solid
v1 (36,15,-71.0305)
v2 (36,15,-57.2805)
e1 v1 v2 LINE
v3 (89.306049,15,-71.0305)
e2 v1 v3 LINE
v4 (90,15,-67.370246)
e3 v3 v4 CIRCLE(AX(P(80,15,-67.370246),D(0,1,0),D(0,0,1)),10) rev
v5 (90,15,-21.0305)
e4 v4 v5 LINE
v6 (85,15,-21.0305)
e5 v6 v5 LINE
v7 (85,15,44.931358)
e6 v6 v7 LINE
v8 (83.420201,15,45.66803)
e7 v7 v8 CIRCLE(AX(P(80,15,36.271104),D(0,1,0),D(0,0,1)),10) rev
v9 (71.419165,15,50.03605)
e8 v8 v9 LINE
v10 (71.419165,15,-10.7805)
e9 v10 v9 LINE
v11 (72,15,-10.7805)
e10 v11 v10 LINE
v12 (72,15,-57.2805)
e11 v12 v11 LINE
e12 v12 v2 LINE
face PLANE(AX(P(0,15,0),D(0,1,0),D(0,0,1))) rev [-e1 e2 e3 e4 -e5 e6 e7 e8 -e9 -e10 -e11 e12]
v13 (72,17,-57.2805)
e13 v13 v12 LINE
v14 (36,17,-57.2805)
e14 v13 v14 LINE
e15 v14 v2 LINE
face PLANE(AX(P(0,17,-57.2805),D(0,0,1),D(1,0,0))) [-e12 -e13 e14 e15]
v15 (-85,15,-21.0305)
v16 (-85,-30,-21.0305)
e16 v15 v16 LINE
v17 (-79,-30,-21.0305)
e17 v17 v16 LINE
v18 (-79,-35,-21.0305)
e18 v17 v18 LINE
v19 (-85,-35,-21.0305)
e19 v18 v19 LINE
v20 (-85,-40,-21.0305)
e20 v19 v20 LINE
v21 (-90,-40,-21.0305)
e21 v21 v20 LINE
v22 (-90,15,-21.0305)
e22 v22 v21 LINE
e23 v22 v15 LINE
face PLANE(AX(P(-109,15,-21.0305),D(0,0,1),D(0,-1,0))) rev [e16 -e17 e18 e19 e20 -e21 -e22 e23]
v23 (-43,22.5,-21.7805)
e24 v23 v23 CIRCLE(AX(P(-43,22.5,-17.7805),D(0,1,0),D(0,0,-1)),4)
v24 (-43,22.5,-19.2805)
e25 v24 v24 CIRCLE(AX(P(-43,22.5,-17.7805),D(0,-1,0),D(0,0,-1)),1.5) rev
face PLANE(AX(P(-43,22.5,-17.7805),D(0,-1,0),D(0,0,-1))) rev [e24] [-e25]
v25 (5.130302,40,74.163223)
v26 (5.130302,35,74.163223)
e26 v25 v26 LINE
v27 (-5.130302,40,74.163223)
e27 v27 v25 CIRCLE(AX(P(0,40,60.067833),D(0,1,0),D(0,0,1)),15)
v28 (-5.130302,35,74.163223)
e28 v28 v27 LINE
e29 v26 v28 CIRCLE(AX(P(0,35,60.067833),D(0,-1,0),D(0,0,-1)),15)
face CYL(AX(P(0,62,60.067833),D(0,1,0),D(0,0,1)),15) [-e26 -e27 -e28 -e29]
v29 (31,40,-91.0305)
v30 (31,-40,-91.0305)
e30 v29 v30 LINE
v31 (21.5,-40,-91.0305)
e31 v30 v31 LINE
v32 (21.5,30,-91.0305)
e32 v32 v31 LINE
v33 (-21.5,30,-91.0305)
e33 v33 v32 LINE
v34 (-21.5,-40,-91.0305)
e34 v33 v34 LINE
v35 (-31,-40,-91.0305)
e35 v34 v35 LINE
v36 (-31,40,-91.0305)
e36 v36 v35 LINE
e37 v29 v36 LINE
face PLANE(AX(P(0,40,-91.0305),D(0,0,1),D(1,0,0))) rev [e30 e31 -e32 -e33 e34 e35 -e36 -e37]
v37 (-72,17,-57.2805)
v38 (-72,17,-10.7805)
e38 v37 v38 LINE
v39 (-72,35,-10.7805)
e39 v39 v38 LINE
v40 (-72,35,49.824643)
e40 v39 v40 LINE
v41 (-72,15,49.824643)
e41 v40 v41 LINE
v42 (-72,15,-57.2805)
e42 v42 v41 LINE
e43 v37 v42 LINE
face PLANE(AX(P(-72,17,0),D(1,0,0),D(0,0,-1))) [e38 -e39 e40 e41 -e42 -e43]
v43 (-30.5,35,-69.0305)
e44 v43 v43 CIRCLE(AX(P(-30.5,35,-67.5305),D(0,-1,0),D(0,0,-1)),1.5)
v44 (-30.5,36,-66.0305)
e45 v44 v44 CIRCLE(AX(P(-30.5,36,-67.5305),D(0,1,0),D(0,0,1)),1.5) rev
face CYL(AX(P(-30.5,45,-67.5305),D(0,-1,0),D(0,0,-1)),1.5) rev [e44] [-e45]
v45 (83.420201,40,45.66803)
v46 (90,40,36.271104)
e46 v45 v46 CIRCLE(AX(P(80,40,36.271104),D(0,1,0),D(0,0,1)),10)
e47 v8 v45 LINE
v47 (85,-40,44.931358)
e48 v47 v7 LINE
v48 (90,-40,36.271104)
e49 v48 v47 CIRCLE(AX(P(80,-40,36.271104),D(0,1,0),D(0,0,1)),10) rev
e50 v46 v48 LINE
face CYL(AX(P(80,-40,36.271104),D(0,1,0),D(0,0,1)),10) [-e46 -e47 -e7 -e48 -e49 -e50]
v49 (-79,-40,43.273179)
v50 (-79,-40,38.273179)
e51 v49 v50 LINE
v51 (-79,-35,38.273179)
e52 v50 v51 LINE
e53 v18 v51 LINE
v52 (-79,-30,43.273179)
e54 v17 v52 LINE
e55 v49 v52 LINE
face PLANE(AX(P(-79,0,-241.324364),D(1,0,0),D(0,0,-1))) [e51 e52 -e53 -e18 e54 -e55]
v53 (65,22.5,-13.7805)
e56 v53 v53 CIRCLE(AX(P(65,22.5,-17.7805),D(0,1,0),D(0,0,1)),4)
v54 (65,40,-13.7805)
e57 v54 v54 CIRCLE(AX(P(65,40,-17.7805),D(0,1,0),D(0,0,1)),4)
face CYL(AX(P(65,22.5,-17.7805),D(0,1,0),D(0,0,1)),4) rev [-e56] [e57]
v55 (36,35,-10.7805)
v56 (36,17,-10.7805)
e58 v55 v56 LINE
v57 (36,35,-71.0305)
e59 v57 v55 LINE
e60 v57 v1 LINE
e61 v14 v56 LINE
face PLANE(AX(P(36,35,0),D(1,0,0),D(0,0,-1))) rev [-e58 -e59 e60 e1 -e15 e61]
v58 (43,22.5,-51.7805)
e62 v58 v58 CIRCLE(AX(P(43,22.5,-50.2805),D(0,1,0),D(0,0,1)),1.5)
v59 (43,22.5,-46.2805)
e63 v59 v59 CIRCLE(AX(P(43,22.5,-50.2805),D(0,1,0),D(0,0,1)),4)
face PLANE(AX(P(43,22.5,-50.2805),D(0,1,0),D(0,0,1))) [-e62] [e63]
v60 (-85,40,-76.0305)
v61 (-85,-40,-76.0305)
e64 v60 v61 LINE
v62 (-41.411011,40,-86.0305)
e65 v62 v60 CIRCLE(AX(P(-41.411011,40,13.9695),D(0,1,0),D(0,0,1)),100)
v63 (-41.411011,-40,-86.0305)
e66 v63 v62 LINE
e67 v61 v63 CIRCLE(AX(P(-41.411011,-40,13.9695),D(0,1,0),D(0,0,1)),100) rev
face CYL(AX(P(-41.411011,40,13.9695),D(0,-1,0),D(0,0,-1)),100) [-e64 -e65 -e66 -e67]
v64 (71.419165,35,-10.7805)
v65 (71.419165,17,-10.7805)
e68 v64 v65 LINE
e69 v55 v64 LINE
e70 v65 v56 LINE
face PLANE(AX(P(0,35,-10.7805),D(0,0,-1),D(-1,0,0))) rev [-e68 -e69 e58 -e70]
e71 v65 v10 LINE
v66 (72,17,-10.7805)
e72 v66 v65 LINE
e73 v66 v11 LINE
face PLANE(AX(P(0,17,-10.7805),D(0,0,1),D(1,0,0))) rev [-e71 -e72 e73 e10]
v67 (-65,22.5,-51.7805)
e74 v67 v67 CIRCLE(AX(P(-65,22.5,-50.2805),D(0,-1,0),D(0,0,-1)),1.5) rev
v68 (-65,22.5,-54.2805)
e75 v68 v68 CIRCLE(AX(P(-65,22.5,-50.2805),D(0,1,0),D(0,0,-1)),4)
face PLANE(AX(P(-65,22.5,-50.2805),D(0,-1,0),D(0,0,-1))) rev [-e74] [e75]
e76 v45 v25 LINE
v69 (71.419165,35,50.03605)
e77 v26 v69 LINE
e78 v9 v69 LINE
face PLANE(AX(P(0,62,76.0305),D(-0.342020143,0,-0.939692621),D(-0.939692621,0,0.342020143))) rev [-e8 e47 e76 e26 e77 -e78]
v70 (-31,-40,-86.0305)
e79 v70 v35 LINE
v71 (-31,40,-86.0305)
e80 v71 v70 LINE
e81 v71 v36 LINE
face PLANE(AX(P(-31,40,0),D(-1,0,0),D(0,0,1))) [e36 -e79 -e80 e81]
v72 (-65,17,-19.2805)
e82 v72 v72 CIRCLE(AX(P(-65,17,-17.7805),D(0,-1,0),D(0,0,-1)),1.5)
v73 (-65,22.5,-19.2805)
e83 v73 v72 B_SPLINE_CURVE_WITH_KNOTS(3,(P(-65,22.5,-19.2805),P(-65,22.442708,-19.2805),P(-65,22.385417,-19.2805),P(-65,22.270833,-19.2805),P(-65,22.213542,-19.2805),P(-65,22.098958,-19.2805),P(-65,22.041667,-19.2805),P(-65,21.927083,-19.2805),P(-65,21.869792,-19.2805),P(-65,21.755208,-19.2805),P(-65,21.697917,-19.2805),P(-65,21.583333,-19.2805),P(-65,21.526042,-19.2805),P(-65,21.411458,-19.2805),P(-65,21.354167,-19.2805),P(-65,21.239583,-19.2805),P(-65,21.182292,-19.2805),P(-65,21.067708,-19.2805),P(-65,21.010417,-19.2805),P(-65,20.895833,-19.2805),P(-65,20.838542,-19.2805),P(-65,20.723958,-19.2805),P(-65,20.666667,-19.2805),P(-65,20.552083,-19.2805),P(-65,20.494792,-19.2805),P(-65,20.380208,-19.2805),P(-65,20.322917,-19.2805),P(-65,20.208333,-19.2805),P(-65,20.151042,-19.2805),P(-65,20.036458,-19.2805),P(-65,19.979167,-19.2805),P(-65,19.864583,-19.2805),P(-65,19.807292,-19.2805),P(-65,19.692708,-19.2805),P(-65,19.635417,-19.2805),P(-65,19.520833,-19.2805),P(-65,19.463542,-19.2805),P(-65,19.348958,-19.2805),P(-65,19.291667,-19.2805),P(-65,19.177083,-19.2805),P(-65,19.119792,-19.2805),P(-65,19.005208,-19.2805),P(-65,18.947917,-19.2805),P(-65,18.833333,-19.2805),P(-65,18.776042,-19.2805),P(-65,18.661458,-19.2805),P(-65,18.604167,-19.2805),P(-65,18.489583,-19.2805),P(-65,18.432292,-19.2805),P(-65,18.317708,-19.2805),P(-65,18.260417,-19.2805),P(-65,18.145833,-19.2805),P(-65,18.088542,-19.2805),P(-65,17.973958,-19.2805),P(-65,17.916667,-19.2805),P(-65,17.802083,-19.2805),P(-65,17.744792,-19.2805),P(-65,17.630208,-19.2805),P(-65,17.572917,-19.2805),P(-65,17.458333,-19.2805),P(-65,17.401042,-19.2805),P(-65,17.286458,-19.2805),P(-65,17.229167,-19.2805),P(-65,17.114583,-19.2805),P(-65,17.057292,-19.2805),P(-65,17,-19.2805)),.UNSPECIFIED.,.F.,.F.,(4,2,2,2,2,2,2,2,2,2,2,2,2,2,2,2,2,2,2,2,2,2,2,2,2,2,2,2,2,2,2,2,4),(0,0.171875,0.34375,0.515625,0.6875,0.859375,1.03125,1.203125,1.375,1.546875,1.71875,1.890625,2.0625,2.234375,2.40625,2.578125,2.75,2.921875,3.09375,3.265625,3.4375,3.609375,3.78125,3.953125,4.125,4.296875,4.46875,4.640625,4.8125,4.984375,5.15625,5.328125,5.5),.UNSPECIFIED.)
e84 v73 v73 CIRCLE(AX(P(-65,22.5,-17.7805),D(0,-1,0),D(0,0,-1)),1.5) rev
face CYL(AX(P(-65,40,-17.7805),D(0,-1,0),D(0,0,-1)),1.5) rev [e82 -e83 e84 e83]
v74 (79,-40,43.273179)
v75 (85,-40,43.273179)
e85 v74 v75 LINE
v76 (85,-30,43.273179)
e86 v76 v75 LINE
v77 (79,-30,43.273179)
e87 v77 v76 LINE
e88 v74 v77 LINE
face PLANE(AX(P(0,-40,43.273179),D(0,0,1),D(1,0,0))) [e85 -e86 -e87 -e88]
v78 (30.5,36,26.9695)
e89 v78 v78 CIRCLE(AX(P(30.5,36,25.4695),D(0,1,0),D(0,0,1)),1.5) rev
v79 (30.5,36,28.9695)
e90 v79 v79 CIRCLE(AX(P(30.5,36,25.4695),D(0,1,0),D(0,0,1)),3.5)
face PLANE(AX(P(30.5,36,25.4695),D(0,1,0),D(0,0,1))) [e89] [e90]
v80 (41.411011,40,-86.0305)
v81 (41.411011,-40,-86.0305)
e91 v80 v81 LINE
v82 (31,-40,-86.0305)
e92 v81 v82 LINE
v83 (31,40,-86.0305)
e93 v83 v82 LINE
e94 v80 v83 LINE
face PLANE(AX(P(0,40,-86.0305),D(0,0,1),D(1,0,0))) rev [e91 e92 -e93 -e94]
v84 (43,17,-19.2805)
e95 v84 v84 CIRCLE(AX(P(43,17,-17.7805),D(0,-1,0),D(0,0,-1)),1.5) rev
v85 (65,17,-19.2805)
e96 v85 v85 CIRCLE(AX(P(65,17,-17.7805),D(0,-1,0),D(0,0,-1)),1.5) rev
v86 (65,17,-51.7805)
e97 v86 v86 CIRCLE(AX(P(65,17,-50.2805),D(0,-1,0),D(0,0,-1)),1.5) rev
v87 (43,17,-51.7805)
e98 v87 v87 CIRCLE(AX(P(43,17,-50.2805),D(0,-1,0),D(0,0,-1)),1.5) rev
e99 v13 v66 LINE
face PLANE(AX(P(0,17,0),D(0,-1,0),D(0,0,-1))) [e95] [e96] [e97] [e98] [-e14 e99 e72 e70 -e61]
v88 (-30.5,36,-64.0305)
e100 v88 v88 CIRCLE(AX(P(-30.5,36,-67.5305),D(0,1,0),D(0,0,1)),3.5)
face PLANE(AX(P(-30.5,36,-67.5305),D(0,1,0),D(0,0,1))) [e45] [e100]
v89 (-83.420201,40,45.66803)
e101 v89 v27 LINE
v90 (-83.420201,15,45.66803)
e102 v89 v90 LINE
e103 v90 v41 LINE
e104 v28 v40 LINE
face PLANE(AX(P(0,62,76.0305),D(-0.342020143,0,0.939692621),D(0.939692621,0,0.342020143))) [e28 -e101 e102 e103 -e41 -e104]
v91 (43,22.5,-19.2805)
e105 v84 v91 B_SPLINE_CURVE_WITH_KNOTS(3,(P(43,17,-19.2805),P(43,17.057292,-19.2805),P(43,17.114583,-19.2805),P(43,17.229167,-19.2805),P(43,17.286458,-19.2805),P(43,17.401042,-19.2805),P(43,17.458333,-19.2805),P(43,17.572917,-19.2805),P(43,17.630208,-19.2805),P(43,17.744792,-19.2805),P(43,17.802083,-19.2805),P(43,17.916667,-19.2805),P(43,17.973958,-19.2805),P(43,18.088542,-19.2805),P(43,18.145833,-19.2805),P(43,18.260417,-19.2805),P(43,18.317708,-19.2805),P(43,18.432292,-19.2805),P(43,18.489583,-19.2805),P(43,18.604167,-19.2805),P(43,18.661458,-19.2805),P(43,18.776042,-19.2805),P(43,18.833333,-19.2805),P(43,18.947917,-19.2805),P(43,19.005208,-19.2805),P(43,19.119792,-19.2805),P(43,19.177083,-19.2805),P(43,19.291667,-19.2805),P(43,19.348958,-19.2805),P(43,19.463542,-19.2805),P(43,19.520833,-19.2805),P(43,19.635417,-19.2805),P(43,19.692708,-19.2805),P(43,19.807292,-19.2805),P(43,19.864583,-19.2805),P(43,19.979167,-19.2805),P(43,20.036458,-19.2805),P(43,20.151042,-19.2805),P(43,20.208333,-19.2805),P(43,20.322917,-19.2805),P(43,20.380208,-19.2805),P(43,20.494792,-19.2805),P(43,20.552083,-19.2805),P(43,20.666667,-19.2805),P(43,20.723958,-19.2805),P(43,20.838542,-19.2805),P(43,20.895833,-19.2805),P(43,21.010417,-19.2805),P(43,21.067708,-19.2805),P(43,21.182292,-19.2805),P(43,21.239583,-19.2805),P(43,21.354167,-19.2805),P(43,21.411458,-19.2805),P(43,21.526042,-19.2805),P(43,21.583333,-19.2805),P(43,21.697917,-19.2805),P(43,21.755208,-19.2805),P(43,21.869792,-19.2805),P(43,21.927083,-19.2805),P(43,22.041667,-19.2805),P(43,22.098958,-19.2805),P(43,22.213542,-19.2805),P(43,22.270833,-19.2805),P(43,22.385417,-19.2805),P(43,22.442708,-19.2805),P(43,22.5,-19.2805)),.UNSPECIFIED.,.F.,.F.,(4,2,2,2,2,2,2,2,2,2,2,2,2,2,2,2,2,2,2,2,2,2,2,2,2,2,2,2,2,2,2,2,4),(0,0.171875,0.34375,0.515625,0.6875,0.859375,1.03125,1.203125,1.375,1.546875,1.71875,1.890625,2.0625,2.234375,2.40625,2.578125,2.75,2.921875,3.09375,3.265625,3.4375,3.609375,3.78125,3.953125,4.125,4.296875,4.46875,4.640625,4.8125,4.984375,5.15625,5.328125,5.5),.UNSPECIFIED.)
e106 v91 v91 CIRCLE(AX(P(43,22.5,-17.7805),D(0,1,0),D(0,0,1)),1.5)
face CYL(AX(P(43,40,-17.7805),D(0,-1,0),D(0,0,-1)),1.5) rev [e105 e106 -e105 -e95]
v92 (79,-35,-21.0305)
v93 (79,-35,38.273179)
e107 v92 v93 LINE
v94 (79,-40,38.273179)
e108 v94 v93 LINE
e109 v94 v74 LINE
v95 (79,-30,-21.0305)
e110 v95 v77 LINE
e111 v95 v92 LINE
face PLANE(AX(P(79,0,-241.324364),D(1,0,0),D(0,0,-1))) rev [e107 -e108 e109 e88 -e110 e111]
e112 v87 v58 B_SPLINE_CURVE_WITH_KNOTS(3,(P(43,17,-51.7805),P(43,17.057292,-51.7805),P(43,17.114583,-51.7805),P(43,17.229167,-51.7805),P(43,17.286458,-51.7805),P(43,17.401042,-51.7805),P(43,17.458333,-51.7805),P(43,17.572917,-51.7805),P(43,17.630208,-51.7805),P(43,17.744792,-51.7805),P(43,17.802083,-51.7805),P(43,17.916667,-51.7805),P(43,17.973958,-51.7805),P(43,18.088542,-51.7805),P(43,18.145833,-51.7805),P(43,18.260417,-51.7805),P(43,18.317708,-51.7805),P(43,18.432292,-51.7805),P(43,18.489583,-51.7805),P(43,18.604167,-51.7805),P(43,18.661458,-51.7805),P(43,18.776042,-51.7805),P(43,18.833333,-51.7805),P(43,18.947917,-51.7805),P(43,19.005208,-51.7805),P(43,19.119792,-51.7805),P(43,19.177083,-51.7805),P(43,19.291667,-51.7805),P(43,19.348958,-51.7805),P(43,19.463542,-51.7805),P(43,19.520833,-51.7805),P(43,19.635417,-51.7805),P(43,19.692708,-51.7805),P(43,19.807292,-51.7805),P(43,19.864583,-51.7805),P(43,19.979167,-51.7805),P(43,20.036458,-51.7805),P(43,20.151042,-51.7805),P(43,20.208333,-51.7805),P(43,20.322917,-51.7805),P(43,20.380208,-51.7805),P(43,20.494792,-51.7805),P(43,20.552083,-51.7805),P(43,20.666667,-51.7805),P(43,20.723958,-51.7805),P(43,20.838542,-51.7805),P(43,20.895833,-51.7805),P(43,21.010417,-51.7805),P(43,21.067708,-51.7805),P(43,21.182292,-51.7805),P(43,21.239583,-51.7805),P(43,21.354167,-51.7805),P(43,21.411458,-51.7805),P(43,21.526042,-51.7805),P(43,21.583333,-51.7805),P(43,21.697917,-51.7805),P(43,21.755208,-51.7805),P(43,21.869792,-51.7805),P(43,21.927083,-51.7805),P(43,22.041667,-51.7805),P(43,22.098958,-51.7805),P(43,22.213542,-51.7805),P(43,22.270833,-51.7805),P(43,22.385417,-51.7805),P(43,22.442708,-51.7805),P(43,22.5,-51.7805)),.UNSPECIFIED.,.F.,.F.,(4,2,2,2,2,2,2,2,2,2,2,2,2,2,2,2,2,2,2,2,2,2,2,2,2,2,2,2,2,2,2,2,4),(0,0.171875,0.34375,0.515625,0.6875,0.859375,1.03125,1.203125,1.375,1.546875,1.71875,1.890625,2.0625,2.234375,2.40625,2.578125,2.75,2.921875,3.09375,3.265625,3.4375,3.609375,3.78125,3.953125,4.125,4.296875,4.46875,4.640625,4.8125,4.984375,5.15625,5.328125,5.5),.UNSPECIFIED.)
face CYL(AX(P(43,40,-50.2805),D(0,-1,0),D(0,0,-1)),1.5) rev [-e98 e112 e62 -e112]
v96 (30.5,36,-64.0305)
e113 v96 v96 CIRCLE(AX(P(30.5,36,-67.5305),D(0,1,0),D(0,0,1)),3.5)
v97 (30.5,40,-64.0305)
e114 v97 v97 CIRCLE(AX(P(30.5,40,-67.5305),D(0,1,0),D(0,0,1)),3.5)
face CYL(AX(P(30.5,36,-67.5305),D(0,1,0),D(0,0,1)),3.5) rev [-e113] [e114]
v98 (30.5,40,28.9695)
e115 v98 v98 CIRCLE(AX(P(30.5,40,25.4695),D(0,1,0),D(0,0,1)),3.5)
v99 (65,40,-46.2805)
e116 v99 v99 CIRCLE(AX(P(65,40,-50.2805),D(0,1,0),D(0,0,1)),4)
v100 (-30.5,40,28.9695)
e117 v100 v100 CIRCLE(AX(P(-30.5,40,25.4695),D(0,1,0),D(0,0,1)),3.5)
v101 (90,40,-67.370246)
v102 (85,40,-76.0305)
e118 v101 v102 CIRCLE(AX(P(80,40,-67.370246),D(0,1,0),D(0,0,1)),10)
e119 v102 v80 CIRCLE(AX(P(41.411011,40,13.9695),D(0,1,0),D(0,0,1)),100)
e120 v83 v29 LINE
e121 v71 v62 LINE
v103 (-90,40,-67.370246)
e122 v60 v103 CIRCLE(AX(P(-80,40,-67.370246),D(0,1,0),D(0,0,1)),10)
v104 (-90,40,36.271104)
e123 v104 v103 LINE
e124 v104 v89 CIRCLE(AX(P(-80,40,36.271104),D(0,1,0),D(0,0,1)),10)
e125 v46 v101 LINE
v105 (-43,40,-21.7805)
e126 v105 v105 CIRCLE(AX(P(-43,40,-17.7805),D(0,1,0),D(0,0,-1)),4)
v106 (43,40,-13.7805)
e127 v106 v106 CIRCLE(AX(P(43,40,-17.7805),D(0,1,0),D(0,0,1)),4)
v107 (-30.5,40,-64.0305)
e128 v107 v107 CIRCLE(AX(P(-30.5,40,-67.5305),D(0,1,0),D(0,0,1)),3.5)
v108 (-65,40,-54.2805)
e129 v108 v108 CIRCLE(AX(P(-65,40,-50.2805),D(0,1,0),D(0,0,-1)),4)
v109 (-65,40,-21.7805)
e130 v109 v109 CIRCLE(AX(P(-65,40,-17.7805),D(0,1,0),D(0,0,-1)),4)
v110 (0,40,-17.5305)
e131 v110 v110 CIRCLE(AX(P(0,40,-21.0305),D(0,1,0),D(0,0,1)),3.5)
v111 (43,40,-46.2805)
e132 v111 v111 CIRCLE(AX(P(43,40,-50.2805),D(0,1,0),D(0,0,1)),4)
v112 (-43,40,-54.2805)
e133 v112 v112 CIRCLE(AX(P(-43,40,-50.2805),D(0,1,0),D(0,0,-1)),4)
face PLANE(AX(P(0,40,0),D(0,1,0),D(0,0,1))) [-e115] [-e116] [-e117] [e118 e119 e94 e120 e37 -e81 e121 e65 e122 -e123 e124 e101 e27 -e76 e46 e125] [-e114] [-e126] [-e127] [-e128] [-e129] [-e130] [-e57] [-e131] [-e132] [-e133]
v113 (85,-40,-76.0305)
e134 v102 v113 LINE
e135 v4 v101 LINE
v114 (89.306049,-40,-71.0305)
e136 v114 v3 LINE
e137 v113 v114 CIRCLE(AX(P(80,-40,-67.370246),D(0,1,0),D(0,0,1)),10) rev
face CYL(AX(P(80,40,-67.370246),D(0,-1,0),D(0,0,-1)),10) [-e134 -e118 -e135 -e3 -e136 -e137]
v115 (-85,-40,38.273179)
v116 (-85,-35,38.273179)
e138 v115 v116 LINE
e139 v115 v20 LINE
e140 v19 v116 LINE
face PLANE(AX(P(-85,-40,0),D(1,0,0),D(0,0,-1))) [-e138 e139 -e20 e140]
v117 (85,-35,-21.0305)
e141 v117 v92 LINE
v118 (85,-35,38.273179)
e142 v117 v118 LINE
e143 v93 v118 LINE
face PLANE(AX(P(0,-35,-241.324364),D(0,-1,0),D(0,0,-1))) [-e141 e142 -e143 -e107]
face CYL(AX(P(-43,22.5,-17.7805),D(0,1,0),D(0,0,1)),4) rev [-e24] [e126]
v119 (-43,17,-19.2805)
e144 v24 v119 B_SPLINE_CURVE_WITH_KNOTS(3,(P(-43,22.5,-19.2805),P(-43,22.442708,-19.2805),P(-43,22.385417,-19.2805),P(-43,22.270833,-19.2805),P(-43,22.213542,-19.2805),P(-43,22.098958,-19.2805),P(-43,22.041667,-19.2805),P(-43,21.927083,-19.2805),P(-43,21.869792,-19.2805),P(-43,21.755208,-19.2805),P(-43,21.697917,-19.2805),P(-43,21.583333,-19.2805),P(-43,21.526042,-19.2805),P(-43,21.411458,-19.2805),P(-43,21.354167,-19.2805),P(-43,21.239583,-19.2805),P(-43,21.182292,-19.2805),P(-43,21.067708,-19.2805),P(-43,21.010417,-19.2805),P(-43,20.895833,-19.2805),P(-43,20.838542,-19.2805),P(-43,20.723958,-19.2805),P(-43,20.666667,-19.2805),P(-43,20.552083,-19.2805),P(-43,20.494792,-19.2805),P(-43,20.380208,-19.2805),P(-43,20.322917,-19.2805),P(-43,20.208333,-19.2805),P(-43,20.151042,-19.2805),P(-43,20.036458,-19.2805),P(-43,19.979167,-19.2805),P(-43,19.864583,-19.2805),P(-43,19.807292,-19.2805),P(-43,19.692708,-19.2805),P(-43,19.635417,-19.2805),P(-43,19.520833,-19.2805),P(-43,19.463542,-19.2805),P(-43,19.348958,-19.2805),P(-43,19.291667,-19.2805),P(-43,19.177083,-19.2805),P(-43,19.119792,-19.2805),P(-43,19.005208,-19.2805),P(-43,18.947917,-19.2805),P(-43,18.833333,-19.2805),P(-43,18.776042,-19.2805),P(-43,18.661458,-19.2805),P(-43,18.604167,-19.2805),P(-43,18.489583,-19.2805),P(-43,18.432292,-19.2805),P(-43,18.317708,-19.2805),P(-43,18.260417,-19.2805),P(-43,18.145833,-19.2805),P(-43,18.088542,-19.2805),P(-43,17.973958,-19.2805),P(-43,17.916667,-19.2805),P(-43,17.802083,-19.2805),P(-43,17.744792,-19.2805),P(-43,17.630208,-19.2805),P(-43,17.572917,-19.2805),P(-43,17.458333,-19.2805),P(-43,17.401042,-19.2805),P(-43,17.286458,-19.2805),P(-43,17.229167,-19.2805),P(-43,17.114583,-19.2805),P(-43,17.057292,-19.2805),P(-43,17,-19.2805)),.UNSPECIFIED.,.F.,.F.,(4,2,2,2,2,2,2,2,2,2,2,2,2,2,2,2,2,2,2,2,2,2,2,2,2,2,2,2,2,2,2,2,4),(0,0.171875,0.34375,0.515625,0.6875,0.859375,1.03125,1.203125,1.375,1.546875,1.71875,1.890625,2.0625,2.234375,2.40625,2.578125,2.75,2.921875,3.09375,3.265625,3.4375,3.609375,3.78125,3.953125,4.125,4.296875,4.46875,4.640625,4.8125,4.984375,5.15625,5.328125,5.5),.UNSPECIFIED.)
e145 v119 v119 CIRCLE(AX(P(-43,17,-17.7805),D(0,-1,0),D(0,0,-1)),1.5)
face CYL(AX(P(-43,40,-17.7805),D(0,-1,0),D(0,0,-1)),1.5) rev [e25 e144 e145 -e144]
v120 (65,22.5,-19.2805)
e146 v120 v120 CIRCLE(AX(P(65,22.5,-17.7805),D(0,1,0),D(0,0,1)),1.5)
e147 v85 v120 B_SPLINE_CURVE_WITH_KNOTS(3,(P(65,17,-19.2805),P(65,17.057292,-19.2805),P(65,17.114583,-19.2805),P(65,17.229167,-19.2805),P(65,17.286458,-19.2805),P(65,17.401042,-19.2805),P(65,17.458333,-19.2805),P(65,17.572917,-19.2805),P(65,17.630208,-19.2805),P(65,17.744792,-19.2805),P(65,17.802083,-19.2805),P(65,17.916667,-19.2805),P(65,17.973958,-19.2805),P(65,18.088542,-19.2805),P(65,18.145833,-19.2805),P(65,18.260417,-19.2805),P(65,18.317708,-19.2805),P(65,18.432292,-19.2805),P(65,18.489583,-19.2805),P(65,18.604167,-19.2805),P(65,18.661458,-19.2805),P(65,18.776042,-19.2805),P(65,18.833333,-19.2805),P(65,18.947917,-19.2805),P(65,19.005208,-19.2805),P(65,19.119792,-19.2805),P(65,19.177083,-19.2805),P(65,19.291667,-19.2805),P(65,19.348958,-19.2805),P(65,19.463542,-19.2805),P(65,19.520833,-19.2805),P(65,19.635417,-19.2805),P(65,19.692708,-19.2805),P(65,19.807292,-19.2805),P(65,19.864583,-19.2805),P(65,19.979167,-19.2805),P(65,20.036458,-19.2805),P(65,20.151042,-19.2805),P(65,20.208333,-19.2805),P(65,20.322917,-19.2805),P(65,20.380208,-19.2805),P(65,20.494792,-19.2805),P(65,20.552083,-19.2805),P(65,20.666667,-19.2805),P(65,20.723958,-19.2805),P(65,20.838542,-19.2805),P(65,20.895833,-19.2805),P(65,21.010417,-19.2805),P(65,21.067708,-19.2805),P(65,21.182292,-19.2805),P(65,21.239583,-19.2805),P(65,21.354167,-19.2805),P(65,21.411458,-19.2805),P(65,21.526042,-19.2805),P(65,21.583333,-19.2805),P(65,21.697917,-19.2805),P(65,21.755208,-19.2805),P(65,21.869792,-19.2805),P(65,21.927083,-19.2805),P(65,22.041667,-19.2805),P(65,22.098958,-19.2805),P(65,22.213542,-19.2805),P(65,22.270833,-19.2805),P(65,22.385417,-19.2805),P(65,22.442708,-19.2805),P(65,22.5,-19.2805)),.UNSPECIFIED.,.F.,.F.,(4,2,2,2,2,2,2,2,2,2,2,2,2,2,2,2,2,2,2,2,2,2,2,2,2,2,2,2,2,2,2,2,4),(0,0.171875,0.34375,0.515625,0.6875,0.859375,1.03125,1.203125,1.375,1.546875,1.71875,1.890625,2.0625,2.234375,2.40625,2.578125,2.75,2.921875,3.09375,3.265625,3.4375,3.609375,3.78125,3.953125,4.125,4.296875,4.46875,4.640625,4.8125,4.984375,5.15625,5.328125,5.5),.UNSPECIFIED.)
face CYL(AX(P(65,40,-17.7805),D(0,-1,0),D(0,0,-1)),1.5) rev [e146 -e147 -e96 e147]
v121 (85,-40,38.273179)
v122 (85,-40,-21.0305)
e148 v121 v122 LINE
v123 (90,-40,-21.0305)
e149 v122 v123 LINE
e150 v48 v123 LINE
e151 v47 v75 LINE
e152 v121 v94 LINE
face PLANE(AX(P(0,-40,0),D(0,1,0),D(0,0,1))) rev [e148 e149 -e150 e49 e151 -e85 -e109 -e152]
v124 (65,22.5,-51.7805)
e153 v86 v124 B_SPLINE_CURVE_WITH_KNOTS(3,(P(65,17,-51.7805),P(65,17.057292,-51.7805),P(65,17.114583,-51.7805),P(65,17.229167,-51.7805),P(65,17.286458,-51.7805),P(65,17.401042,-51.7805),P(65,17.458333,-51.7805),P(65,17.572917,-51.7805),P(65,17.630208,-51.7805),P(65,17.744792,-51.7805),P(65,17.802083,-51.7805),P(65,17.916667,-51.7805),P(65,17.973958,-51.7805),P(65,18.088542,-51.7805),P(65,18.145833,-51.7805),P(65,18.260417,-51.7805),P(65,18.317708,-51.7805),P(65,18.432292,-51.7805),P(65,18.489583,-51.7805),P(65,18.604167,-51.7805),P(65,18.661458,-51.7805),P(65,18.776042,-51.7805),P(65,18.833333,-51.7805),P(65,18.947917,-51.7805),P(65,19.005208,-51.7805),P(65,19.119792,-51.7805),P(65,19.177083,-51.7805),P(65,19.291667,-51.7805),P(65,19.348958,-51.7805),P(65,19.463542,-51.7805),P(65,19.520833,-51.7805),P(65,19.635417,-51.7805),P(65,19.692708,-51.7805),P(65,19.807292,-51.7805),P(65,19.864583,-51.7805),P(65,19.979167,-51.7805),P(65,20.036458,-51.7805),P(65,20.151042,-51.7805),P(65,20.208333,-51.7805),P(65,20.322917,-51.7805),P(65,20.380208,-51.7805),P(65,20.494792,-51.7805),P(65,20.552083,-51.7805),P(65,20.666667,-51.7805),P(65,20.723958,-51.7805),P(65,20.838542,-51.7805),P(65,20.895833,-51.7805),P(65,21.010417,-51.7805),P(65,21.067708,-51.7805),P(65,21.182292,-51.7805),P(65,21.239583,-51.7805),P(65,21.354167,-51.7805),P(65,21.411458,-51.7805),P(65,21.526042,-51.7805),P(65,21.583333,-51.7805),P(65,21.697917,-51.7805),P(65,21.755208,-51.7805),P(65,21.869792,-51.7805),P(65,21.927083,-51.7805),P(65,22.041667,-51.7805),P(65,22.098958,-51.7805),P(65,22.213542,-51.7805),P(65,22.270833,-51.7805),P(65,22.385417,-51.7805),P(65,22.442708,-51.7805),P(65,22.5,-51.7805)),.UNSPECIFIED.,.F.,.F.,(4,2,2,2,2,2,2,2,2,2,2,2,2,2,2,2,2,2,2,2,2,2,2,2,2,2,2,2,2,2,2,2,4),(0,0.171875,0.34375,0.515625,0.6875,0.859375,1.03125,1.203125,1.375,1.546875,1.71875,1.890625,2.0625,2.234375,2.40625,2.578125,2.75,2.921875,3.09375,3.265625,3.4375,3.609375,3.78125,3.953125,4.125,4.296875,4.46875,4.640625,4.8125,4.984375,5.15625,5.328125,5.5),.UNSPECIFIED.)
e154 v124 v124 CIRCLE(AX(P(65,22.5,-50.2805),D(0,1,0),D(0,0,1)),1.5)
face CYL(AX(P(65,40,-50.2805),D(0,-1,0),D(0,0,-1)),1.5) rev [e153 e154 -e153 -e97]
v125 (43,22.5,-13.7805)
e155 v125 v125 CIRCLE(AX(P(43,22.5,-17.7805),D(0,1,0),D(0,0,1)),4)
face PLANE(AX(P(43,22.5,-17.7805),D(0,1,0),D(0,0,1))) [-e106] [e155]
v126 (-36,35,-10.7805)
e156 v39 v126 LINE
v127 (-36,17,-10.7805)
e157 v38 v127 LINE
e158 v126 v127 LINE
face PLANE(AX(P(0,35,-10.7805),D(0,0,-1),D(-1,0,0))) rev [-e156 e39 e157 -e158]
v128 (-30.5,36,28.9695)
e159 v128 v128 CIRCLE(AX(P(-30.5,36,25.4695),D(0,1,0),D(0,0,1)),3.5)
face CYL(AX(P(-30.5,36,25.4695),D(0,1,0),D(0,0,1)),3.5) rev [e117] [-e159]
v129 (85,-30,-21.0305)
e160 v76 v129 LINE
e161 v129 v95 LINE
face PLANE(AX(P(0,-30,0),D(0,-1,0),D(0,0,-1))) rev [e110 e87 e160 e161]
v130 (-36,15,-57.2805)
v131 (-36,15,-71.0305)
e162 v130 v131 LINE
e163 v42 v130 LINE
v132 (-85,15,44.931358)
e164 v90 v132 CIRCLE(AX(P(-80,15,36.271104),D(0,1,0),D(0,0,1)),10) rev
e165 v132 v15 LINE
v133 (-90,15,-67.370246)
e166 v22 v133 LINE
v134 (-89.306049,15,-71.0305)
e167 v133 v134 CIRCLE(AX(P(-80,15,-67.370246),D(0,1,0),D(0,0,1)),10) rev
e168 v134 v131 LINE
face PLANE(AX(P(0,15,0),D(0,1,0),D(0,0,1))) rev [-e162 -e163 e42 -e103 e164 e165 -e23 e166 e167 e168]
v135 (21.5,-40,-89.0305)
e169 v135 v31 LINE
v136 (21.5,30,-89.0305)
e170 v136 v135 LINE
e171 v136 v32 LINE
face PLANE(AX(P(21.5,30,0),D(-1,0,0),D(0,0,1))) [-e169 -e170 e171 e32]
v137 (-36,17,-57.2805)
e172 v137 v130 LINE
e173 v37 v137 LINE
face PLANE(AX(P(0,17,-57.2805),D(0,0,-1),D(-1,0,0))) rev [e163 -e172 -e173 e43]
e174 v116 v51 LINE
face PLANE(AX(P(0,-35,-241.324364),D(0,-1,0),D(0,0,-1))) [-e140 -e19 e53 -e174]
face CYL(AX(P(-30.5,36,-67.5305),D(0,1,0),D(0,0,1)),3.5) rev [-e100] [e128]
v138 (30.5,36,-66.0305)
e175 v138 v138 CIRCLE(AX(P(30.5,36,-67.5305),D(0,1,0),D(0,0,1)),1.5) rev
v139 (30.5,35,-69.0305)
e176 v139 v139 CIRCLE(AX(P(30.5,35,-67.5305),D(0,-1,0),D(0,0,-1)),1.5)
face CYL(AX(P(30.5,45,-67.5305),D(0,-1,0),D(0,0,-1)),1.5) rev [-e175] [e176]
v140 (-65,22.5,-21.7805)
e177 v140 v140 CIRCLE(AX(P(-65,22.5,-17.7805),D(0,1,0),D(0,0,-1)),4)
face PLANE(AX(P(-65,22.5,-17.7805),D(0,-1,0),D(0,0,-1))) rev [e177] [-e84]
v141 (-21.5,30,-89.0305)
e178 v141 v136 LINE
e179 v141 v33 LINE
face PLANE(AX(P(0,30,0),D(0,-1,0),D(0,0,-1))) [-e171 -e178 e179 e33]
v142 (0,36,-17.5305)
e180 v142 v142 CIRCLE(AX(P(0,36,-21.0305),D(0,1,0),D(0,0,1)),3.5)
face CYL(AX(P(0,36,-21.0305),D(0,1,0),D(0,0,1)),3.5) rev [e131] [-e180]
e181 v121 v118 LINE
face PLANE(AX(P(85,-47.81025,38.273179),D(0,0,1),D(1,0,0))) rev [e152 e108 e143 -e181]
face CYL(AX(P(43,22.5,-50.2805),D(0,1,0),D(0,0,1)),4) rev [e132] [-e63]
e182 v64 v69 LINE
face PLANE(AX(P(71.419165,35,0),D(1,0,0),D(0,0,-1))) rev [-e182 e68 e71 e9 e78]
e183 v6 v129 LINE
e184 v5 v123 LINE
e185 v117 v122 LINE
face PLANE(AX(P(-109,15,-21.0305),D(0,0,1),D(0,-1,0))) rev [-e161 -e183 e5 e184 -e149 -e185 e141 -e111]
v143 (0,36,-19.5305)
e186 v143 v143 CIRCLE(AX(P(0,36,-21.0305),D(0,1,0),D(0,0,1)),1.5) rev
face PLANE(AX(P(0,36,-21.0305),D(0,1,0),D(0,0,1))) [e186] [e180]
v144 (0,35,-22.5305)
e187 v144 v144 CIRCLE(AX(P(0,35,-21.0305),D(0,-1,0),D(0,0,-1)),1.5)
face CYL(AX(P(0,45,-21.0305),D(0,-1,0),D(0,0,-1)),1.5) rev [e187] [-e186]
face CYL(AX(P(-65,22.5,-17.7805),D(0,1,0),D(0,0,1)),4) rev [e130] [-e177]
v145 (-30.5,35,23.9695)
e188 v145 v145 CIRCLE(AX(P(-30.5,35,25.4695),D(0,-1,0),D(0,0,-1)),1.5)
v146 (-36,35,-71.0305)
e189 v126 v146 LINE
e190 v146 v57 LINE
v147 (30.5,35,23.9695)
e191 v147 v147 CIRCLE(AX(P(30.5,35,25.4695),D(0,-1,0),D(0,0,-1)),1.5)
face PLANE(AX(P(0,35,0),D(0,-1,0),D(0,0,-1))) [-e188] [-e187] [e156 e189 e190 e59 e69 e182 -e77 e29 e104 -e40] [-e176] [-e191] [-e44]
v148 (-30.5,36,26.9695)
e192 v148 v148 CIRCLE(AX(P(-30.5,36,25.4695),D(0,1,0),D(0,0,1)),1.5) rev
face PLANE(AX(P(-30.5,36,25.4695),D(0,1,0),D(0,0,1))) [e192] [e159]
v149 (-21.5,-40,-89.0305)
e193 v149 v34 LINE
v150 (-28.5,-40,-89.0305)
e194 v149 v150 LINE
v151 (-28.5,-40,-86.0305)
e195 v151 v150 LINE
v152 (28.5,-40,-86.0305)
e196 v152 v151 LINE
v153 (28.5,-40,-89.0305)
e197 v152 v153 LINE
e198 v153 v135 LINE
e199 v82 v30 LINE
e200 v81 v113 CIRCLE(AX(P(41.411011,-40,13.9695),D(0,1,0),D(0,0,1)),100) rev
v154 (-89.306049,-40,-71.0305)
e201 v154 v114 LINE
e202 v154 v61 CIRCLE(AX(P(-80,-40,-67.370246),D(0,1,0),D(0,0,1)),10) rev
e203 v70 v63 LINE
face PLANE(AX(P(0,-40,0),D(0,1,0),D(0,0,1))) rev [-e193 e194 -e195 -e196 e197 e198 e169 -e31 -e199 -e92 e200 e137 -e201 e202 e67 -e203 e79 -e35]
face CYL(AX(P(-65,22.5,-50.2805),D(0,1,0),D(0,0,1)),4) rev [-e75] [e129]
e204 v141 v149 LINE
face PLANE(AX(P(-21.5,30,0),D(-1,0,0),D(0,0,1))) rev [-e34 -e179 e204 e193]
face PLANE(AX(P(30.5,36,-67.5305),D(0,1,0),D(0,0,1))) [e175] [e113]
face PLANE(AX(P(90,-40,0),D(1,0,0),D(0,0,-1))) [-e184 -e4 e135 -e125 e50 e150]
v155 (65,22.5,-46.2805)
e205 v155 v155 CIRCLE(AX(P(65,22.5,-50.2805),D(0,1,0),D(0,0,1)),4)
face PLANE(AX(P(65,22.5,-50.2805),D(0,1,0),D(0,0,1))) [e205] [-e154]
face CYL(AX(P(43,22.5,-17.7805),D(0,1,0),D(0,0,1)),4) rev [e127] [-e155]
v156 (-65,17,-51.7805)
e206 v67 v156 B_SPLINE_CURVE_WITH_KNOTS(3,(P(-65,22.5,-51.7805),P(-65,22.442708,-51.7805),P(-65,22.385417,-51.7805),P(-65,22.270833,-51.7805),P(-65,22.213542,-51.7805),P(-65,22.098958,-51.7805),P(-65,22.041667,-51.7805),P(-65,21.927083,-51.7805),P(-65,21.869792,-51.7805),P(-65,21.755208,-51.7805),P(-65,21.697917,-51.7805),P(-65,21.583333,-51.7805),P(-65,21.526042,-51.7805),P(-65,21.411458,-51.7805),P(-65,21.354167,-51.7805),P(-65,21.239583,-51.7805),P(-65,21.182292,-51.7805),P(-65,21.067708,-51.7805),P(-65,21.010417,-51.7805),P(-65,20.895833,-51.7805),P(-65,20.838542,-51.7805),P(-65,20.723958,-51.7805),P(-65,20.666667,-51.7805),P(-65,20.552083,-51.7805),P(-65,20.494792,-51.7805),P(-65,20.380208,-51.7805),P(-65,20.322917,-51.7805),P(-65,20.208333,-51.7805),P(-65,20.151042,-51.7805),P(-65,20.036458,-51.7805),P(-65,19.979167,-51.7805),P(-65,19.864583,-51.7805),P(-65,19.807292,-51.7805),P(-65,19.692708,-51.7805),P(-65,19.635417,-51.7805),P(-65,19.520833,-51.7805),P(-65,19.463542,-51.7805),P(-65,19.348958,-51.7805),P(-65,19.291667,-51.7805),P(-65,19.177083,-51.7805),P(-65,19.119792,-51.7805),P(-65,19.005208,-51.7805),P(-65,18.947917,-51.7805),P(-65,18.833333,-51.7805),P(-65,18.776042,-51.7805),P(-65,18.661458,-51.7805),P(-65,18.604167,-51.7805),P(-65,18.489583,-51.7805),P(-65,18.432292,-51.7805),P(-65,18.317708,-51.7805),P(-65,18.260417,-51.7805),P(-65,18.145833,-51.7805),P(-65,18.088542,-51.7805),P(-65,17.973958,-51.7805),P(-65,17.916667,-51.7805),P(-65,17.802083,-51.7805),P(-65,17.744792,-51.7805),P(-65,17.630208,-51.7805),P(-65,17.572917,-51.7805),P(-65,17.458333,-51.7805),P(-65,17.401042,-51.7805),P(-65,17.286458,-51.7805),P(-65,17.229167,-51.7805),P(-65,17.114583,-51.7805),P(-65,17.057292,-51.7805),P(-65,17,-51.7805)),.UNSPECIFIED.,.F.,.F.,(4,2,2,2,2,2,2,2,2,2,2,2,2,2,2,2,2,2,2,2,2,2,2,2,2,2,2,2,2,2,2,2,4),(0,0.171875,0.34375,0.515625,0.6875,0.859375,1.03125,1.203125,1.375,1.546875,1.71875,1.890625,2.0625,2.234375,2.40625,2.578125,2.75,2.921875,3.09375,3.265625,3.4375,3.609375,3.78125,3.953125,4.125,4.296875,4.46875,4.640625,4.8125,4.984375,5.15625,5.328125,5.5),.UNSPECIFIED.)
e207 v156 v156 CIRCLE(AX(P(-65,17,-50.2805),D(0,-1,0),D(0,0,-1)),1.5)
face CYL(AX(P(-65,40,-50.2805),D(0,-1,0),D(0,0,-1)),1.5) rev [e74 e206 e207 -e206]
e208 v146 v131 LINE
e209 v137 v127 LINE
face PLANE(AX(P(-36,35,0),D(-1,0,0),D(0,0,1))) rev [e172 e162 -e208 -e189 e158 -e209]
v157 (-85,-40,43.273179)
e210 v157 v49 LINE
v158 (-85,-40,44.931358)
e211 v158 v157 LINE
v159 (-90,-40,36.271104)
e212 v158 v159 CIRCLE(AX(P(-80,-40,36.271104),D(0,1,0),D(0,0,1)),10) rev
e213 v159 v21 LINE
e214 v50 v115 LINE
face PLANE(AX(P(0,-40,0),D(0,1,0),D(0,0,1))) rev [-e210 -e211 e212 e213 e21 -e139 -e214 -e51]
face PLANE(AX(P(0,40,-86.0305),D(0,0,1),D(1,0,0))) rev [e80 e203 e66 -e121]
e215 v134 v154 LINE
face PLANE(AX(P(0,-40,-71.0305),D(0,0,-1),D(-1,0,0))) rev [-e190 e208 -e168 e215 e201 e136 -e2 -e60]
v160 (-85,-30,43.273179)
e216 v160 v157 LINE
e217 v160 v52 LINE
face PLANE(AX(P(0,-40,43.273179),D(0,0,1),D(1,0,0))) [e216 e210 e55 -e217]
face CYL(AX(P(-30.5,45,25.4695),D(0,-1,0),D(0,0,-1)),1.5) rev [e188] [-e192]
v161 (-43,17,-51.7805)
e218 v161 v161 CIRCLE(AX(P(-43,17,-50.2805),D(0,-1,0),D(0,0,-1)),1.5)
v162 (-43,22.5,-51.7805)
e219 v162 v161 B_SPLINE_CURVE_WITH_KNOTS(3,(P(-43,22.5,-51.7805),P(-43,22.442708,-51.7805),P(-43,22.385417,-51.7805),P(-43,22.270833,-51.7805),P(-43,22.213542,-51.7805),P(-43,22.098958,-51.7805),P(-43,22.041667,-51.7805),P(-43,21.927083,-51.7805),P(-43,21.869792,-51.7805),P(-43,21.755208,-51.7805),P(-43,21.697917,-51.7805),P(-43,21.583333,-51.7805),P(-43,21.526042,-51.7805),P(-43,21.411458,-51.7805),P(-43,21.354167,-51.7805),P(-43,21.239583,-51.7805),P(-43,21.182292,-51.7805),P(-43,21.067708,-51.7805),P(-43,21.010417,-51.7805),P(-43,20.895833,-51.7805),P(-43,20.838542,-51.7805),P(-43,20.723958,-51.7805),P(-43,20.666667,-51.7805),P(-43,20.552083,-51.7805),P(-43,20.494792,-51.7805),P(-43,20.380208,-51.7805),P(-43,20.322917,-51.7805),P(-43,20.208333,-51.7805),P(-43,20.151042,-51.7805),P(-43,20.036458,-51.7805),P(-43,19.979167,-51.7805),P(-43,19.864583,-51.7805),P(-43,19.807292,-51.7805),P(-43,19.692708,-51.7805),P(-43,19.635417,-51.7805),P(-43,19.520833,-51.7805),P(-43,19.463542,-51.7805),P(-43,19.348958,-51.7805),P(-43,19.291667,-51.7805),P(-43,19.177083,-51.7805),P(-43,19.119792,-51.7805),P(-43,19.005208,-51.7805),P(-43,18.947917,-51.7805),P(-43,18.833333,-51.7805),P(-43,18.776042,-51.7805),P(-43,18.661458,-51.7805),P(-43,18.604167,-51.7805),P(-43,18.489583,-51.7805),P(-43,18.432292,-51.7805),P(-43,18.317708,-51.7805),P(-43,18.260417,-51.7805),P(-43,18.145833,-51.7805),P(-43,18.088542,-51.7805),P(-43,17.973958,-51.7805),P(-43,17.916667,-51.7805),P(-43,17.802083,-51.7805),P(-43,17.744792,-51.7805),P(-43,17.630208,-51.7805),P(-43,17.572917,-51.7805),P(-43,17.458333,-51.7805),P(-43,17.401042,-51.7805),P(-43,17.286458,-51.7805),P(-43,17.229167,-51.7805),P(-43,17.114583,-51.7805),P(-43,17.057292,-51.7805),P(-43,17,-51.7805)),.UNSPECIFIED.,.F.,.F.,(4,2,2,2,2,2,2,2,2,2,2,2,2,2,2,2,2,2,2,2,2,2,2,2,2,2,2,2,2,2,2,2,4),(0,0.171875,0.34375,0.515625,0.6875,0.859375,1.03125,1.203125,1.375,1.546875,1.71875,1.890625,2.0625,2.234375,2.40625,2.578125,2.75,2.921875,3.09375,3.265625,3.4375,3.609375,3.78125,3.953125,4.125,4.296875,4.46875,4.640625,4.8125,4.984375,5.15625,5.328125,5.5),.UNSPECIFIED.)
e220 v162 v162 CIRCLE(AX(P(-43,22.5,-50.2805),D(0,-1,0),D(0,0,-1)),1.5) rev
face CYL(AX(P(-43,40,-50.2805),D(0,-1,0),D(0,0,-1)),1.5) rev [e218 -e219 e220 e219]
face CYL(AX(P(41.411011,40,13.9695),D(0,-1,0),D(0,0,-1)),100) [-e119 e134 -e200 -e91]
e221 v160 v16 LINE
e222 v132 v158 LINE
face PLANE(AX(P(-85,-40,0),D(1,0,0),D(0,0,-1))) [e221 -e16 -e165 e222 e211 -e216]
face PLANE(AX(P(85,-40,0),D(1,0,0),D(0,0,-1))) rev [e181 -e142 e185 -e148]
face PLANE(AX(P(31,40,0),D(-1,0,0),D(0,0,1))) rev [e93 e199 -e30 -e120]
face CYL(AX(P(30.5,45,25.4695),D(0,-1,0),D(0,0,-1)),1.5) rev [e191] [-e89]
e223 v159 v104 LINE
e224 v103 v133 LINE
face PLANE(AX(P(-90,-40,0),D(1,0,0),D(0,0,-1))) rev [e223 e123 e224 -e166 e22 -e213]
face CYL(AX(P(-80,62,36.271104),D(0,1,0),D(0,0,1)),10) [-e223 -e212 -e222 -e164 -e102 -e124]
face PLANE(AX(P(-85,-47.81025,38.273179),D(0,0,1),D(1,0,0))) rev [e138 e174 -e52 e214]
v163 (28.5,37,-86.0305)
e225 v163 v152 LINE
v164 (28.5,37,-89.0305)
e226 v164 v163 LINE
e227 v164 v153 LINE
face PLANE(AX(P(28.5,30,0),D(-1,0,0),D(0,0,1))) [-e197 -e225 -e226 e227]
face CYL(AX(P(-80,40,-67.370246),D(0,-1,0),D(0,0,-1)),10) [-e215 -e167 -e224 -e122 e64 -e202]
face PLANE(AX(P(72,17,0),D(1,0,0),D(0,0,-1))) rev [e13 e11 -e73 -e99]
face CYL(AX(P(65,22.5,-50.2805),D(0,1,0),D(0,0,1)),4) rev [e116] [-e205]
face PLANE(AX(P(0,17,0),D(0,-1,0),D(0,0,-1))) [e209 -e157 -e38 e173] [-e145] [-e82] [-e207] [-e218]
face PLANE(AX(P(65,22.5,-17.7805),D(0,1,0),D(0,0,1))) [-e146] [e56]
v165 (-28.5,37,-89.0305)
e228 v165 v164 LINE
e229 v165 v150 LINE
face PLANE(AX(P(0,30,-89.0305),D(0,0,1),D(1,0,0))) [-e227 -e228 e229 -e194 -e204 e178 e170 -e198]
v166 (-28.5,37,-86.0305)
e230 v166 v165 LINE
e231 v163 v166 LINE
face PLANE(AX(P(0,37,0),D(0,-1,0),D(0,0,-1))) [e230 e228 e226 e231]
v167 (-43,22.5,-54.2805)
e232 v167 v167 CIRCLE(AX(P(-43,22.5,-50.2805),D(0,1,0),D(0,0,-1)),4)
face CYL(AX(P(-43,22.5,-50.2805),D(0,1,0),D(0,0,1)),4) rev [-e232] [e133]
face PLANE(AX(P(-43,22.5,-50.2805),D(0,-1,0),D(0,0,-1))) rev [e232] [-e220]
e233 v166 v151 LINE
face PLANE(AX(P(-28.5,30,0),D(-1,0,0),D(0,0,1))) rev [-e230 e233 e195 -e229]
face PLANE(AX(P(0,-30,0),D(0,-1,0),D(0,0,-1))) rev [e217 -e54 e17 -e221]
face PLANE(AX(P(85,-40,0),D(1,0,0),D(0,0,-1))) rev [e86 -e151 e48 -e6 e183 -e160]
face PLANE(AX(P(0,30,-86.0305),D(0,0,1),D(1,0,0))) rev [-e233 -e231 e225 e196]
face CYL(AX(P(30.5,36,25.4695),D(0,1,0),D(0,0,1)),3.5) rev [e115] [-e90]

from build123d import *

# Parameters (mm, degrees)
BOSS_EXTRUDE1_DEPTH      = 40
BOSS_EXTRUDE1_DEPTH_BACK = 40
SKETCH1_W                = 180
SKETCH1_H                = 152.061
SHELL1_T                 = -5
SKETCH3_W                = 170
SKETCH3_H                = 142.061
BOSS_EXTRUDE2_DEPTH      = 20
SKETCH2_W                = 36
SKETCH2_H                = 55
CUT_EXTRUDE1_DEPTH       = 220
SKETCH4_W                = 36
SKETCH4_H                = 46.5
SKETCH4_R                = 1.5
CUT_EXTRUDE2_DEPTH       = 2
SKETCH4_3_R              = 1.5
CUT_EXTRUDE3_DEPTH       = 131.021678693
SKETCH5_W                = 159.952904784
SKETCH5_H                = 5
CUT_EXTRUDE4_DEPTH       = 63
SKETCH8_W                = 72
SKETCH8_H                = 29.937457508
CUT_EXTRUDE5_DEPTH       = 20
CUT_EXTRUDE7_DEPTH       = 102
SKETCH11_W               = 62
SKETCH11_H               = 5
BOSS_EXTRUDE3_DEPTH      = 80
SKETCH12_W               = 57
SKETCH12_H               = 3
SKETCH12_W_2             = 43
SKETCH12_H_2             = 2
CUT_EXTRUDE8_DEPTH       = 70
SKETCH13_W               = 57
SKETCH13_H               = 3
CUT_EXTRUDE9_DEPTH       = 7
SKETCH15_R               = 4
CUT_EXTRUDE10_DEPTH      = 17.5
SKETCH9_R                = 1.5
CUT_EXTRUDE11_DEPTH      = 10
BOSS_EXTRUDE4_DEPTH      = 10
SKETCH18_W               = 170
SKETCH18_H               = 5
SKETCH18_W_2             = 158
CUT_EXTRUDE12_DEPTH      = 114.303678916
FILLET3_R                = 100
FILLET2_R                = 10
FILLET1_R                = 15
SKETCH19_W               = 50
SKETCH19_H               = 65
CUT_EXTRUDE13_DEPTH      = 199
SKETCH20_W               = 6
SKETCH20_H               = 5
BOSS_EXTRUDE5_DEPTH      = 5
SKETCH24_R               = 3.5
CUT_EXTRUDE14_DEPTH      = 4


with BuildPart() as part:
    # Sketch1 → Boss-Extrude1 (new, two sides: drawn at the far end of the back side and taken through both)
    with BuildSketch(Plane(origin=(0, 0, 0), x_dir=(1, 0, 0), z_dir=(0, 1, 0)).offset(-BOSS_EXTRUDE1_DEPTH_BACK)):
        Rectangle(SKETCH1_W, SKETCH1_H)
    extrude(amount=BOSS_EXTRUDE1_DEPTH + BOSS_EXTRUDE1_DEPTH_BACK)

    # Shell1
    shell1_openings = [part.faces().sort_by_distance(p)[0] for p in [
        (0, -40, 0),
    ]]
    offset(amount=SHELL1_T, openings=shell1_openings, kind=Kind.INTERSECTION)

    # Sketch3 → Boss-Extrude2 (add)
    with BuildSketch(Plane.XZ.offset(-35)):
        Rectangle(SKETCH3_W, SKETCH3_H)
    extrude(amount=BOSS_EXTRUDE2_DEPTH)

    # Sketch2 → Cut-Extrude1 (cut)
    with BuildSketch(Plane.ZY.offset(90)):
        with Locations((-46.0305, -12.5)):
            Rectangle(SKETCH2_W, SKETCH2_H)
    extrude(amount=-CUT_EXTRUDE1_DEPTH, mode=Mode.SUBTRACT)

    # Sketch4 → Cut-Extrude2 (cut)
    with BuildSketch(Plane.XZ.offset(-15)):
        with Locations((-54, -34.0305)):
            Rectangle(SKETCH4_W, SKETCH4_H)
        with Locations(Location((-43, -50.2805, 0), (0, 0, 270))):
            Circle(SKETCH4_R, mode=Mode.SUBTRACT)
        with Locations(Location((-65, -50.2805, 0), (0, 0, 270))):
            Circle(SKETCH4_R, mode=Mode.SUBTRACT)
        with Locations(Location((-43, -17.7805, 0), (0, 0, 270))):
            Circle(SKETCH4_R, mode=Mode.SUBTRACT)
        with Locations(Location((-65, -17.7805, 0), (0, 0, 270))):
            Circle(SKETCH4_R, mode=Mode.SUBTRACT)
    cut_extrude2 = extrude(amount=-CUT_EXTRUDE2_DEPTH, mode=Mode.SUBTRACT)

    # Sketch4<3> → Cut-Extrude3 (cut, through all)
    with BuildSketch(Plane.XZ.offset(-15)):
        with BuildLine():
            Line((-65, -19.2805), (-65, -17.7805))
            Line((-65, -17.7805), (-63.5, -17.7805))
            ThreePointArc((-63.5, -17.7805), (-66.060660172, -16.719839828), (-65, -19.2805))
        make_face()
        with BuildLine():
            Line((-63.5, -17.7805), (-65, -17.7805))
            Line((-65, -17.7805), (-65, -19.2805))
            ThreePointArc((-65, -19.2805), (-63.939339828, -18.841160172), (-63.5, -17.7805))
        make_face()
        with BuildLine():
            Line((-65, -19.2805), (-65, -17.7805))
            Line((-65, -17.7805), (-63.5, -17.7805))
            ThreePointArc((-63.5, -17.7805), (-66.060660172, -16.719839828), (-65, -19.2805))
        make_face()
        with BuildLine():
            Line((-63.5, -17.7805), (-65, -17.7805))
            Line((-65, -17.7805), (-65, -19.2805))
            ThreePointArc((-65, -19.2805), (-63.939339828, -18.841160172), (-63.5, -17.7805))
        make_face()
        with Locations(Location((-43, -17.7805, 0), (0, 0, 270))):
            Circle(SKETCH4_3_R)
        with Locations(Location((-65, -50.2805, 0), (0, 0, 270))):
            Circle(SKETCH4_3_R)
        with Locations(Location((-43, -50.2805, 0), (0, 0, 270))):
            Circle(SKETCH4_3_R)
    cut_extrude3 = extrude(amount=-CUT_EXTRUDE3_DEPTH, mode=Mode.SUBTRACT)

    # Mirror2: Cut-Extrude2, Cut-Extrude3 across plane
    add(cut_extrude2.mirror(Plane(origin=(0, 0, 0), x_dir=(0, 0, 1), z_dir=(1, 0, 0))), mode=Mode.SUBTRACT)
    add(cut_extrude3.mirror(Plane(origin=(0, 0, 0), x_dir=(0, 0, 1), z_dir=(1, 0, 0))), mode=Mode.SUBTRACT)

    # Sketch5 → Cut-Extrude4 (cut)
    with BuildSketch(Plane.XZ.offset(-15)):
        with Locations((5.023547608, 73.5305)):
            Rectangle(SKETCH5_W, SKETCH5_H)
    extrude(amount=CUT_EXTRUDE4_DEPTH, mode=Mode.SUBTRACT)

    # Sketch8 → Cut-Extrude5 (cut)
    with BuildSketch(Plane.XZ.offset(-15)):
        Polygon((-36, -71.0305), (36, -71.0305), (36, -57.2805), (36, -10.7805), (-36, -10.7805), (-36, -57.2805), align=None)
        with Locations((0, 4.188228754)):
            Rectangle(SKETCH8_W, SKETCH8_H)
        Polygon((36, 19.156957508), (36, -10.7805), (71.419165144, -10.7805), (71.419165144, 76.0305), (-72, 76.0305), (-72, -10.7805), (-36, -10.7805), (-36, 19.156957508), align=None)
    extrude(amount=-CUT_EXTRUDE5_DEPTH, mode=Mode.SUBTRACT)

    # Sketch10 → Cut-Extrude7 (cut)
    with BuildSketch(Plane.XZ.offset(40)):
        Polygon((0, 76.0305), (90, 43.273178916), (90, 76.0305), align=None)
    cut_extrude7 = extrude(amount=-CUT_EXTRUDE7_DEPTH, mode=Mode.SUBTRACT)

    # Mirror3: Cut-Extrude7 across plane
    add(cut_extrude7.mirror(Plane(origin=(0, 0, 0), x_dir=(0, 0, 1), z_dir=(1, 0, 0))), mode=Mode.SUBTRACT)

    # Sketch11 → Boss-Extrude3 (add)
    with BuildSketch(Plane.XZ.offset(40)):
        Polygon((85, -86.0305), (85, -76.0305), (-85, -76.0305), (-85, -86.0305), (-31, -86.0305), (31, -86.0305), align=None)
        with Locations((0, -88.5305)):
            Rectangle(SKETCH11_W, SKETCH11_H)
    extrude(amount=-BOSS_EXTRUDE3_DEPTH)

    # Sketch12 → Cut-Extrude8 (cut)
    with BuildSketch(Plane.XZ.offset(40)):
        with Locations((0, -87.5305)):
            Rectangle(SKETCH12_W, SKETCH12_H)
        with Locations((0, -90.0305)):
            Rectangle(SKETCH12_W_2, SKETCH12_H_2)
    extrude(amount=-CUT_EXTRUDE8_DEPTH, mode=Mode.SUBTRACT)

    # Sketch13 → Cut-Extrude9 (cut)
    with BuildSketch(Plane.XZ.offset(-30)):
        with Locations((0, -87.5305)):
            Rectangle(SKETCH13_W, SKETCH13_H)
    extrude(amount=-CUT_EXTRUDE9_DEPTH, mode=Mode.SUBTRACT)

    # Sketch15 → Cut-Extrude10 (cut)
    with BuildSketch(Plane(origin=(0, 40, 0), x_dir=(1, 0, 0), z_dir=(0, 1, 0))):
        with Locations(Location((65, 17.7805, 0), (0, 0, 270))):
            Circle(SKETCH15_R)
        with Locations(Location((43, 17.7805, 0), (0, 0, 270))):
            Circle(SKETCH15_R)
        with Locations(Location((65, 50.2805, 0), (0, 0, 270))):
            Circle(SKETCH15_R)
        with Locations(Location((-43, 50.2805, 0), (0, 0, 90))):
            Circle(SKETCH15_R)
        with Locations(Location((43, 50.2805, 0), (0, 0, 270))):
            Circle(SKETCH15_R)
        with Locations(Location((-65, 50.2805, 0), (0, 0, 90))):
            Circle(SKETCH15_R)
        with Locations(Location((-43, 17.7805, 0), (0, 0, 90))):
            Circle(SKETCH15_R)
        with Locations(Location((-65, 17.7805, 0), (0, 0, 90))):
            Circle(SKETCH15_R)
    extrude(amount=-CUT_EXTRUDE10_DEPTH, mode=Mode.SUBTRACT)

    # Sketch9 → Cut-Extrude11 (cut)
    with BuildSketch(Plane.XZ.offset(-35)):
        with Locations(Location((30.5, -67.5305, 0), (0, 0, 270))):
            Circle(SKETCH9_R)
        with Locations(Location((-30.5, -67.5305, 0), (0, 0, 270))):
            Circle(SKETCH9_R)
        with Locations(Location((30.5, 25.4695, 0), (0, 0, 270))):
            Circle(SKETCH9_R)
        with Locations(Location((-30.5, 25.4695, 0), (0, 0, 270))):
            Circle(SKETCH9_R)
        with Locations(Location((0, -21.0305, 0), (0, 0, 270))):
            Circle(SKETCH9_R)
    extrude(amount=-CUT_EXTRUDE11_DEPTH, mode=Mode.SUBTRACT)

    # Sketch17 → Boss-Extrude4 (add)
    with BuildSketch(Plane.XZ.offset(30)):
        Polygon((90, 43.273178916), (-90, 43.273178916), (-90, -76.0305), (-85, -76.0305), (85, -76.0305), (90, -76.0305), align=None)
    extrude(amount=BOSS_EXTRUDE4_DEPTH)

    # Sketch18 → Cut-Extrude12 (cut)
    with BuildSketch(Plane.XY.offset(43.273178916)):
        with Locations((0, -37.5)):
            Rectangle(SKETCH18_W, SKETCH18_H)
        with Locations((0, -32.5)):
            Rectangle(SKETCH18_W_2, SKETCH18_H)
    extrude(amount=-CUT_EXTRUDE12_DEPTH, mode=Mode.SUBTRACT)

    # Fillet3
    # the kernel refuses this fillet: 100 mm, written as the material it takes off along each edge
    with BuildSketch(Plane(origin=(-85, -148.972473589, -86.0305), x_dir=(0, 0, 1), z_dir=(0, 1, 0))) as fillet3_piece_1:
        with BuildLine():
            CenterArc((100, 43.588989435), FILLET3_R, 180, 25.841932763)
            Line((0, 43.588989435), (0, 0))
            Line((0, 0), (10, 0))
        make_face()
    extrude(amount=297.944947177, mode=Mode.SUBTRACT)
    with BuildSketch(Plane(origin=(85, -148.972473589, -86.0305), x_dir=(-1, 0, 0), z_dir=(0, 1, 0))) as fillet3_piece_2:
        with BuildLine():
            CenterArc((43.588989435, 100), FILLET3_R, 244.158067237, 25.841932763)
            Line((0, 10), (0, 0))
            Line((0, 0), (43.588989435, 0))
        make_face()
    extrude(amount=297.944947177, mode=Mode.SUBTRACT)

    # Fillet2
    # the kernel refuses this fillet: 10 mm, written as the material it takes off along each edge
    with BuildSketch(Plane(origin=(90, -61.650635095, -76.0305), x_dir=(0, 0, 1), z_dir=(0, 1, 0)), Plane(origin=(-90, 61.650635095, -76.0305), x_dir=(0, 0, 1), z_dir=(0, -1, 0))) as fillet2_piece_1:
        with BuildLine():
            CenterArc((8.660254038, -10), FILLET2_R, 90, 60)
            Line((0, -5), (0, 0))
            Line((0, 0), (8.660254038, 0))
        make_face()
    extrude(amount=123.301270189, mode=Mode.SUBTRACT)
    with BuildSketch(Plane(origin=(-90, 57.505188455, 43.273178916), x_dir=(0.9396926207859103, 0, 0.34202014332566333), z_dir=(0, -1, 0)), Plane(origin=(90, -57.505188455, 43.273178916), x_dir=(-0.9396926207859106, 0, 0.34202014332566244), z_dir=(0, 1, 0))) as fillet2_piece_2:
        with BuildLine():
            CenterArc((FILLET2_R * 0.70020753821, -FILLET2_R), FILLET2_R, 90, 70)
            Line((-FILLET2_R * 0.239485082576, -FILLET2_R * 0.657979856674), (0, 0))
            Line((0, 0), (FILLET2_R * 0.70020753821, 0))
        make_face()
    extrude(amount=115.01037691, mode=Mode.SUBTRACT)

    # Fillet1
    fillet1_edges = [part.edges().sort_by_distance(p)[0] for p in [
        (0, 37.5, 76.0305),
    ]]
    fillet(fillet1_edges, radius=FILLET1_R)

    # Sketch19 → Cut-Extrude13 (cut)
    with BuildSketch(Plane(origin=(90, 0, 0), x_dir=(0, 0, -1), z_dir=(1, 0, 0))):
        with Locations((46.0305, -17.5)):
            Rectangle(SKETCH19_W, SKETCH19_H)
    extrude(amount=-CUT_EXTRUDE13_DEPTH, mode=Mode.SUBTRACT)

    # Sketch20 → Boss-Extrude5 (add)
    with BuildSketch(Plane.XZ.offset(35)):
        with Locations((-82, 40.773178916)):
            Rectangle(SKETCH20_W, SKETCH20_H)
        with Locations((82, 40.773178916)):
            Rectangle(SKETCH20_W, SKETCH20_H)
    extrude(amount=BOSS_EXTRUDE5_DEPTH)

    # Sketch24 → Cut-Extrude14 (cut)
    with BuildSketch(Plane(origin=(0, 40, 0), x_dir=(1, 0, 0), z_dir=(0, 1, 0))):
        with Locations(Location((0, 21.0305, 0), (0, 0, 270))):
            Circle(SKETCH24_R)
        with Locations(Location((-30.5, 67.5305, 0), (0, 0, 270))):
            Circle(SKETCH24_R)
        with Locations(Location((30.5, 67.5305, 0), (0, 0, 270))):
            Circle(SKETCH24_R)
        with Locations(Location((-30.5, -25.4695, 0), (0, 0, 270))):
            Circle(SKETCH24_R)
        with Locations(Location((30.5, -25.4695, 0), (0, 0, 270))):
            Circle(SKETCH24_R)
    extrude(amount=-CUT_EXTRUDE14_DEPTH, mode=Mode.SUBTRACT)


solid = part.part
